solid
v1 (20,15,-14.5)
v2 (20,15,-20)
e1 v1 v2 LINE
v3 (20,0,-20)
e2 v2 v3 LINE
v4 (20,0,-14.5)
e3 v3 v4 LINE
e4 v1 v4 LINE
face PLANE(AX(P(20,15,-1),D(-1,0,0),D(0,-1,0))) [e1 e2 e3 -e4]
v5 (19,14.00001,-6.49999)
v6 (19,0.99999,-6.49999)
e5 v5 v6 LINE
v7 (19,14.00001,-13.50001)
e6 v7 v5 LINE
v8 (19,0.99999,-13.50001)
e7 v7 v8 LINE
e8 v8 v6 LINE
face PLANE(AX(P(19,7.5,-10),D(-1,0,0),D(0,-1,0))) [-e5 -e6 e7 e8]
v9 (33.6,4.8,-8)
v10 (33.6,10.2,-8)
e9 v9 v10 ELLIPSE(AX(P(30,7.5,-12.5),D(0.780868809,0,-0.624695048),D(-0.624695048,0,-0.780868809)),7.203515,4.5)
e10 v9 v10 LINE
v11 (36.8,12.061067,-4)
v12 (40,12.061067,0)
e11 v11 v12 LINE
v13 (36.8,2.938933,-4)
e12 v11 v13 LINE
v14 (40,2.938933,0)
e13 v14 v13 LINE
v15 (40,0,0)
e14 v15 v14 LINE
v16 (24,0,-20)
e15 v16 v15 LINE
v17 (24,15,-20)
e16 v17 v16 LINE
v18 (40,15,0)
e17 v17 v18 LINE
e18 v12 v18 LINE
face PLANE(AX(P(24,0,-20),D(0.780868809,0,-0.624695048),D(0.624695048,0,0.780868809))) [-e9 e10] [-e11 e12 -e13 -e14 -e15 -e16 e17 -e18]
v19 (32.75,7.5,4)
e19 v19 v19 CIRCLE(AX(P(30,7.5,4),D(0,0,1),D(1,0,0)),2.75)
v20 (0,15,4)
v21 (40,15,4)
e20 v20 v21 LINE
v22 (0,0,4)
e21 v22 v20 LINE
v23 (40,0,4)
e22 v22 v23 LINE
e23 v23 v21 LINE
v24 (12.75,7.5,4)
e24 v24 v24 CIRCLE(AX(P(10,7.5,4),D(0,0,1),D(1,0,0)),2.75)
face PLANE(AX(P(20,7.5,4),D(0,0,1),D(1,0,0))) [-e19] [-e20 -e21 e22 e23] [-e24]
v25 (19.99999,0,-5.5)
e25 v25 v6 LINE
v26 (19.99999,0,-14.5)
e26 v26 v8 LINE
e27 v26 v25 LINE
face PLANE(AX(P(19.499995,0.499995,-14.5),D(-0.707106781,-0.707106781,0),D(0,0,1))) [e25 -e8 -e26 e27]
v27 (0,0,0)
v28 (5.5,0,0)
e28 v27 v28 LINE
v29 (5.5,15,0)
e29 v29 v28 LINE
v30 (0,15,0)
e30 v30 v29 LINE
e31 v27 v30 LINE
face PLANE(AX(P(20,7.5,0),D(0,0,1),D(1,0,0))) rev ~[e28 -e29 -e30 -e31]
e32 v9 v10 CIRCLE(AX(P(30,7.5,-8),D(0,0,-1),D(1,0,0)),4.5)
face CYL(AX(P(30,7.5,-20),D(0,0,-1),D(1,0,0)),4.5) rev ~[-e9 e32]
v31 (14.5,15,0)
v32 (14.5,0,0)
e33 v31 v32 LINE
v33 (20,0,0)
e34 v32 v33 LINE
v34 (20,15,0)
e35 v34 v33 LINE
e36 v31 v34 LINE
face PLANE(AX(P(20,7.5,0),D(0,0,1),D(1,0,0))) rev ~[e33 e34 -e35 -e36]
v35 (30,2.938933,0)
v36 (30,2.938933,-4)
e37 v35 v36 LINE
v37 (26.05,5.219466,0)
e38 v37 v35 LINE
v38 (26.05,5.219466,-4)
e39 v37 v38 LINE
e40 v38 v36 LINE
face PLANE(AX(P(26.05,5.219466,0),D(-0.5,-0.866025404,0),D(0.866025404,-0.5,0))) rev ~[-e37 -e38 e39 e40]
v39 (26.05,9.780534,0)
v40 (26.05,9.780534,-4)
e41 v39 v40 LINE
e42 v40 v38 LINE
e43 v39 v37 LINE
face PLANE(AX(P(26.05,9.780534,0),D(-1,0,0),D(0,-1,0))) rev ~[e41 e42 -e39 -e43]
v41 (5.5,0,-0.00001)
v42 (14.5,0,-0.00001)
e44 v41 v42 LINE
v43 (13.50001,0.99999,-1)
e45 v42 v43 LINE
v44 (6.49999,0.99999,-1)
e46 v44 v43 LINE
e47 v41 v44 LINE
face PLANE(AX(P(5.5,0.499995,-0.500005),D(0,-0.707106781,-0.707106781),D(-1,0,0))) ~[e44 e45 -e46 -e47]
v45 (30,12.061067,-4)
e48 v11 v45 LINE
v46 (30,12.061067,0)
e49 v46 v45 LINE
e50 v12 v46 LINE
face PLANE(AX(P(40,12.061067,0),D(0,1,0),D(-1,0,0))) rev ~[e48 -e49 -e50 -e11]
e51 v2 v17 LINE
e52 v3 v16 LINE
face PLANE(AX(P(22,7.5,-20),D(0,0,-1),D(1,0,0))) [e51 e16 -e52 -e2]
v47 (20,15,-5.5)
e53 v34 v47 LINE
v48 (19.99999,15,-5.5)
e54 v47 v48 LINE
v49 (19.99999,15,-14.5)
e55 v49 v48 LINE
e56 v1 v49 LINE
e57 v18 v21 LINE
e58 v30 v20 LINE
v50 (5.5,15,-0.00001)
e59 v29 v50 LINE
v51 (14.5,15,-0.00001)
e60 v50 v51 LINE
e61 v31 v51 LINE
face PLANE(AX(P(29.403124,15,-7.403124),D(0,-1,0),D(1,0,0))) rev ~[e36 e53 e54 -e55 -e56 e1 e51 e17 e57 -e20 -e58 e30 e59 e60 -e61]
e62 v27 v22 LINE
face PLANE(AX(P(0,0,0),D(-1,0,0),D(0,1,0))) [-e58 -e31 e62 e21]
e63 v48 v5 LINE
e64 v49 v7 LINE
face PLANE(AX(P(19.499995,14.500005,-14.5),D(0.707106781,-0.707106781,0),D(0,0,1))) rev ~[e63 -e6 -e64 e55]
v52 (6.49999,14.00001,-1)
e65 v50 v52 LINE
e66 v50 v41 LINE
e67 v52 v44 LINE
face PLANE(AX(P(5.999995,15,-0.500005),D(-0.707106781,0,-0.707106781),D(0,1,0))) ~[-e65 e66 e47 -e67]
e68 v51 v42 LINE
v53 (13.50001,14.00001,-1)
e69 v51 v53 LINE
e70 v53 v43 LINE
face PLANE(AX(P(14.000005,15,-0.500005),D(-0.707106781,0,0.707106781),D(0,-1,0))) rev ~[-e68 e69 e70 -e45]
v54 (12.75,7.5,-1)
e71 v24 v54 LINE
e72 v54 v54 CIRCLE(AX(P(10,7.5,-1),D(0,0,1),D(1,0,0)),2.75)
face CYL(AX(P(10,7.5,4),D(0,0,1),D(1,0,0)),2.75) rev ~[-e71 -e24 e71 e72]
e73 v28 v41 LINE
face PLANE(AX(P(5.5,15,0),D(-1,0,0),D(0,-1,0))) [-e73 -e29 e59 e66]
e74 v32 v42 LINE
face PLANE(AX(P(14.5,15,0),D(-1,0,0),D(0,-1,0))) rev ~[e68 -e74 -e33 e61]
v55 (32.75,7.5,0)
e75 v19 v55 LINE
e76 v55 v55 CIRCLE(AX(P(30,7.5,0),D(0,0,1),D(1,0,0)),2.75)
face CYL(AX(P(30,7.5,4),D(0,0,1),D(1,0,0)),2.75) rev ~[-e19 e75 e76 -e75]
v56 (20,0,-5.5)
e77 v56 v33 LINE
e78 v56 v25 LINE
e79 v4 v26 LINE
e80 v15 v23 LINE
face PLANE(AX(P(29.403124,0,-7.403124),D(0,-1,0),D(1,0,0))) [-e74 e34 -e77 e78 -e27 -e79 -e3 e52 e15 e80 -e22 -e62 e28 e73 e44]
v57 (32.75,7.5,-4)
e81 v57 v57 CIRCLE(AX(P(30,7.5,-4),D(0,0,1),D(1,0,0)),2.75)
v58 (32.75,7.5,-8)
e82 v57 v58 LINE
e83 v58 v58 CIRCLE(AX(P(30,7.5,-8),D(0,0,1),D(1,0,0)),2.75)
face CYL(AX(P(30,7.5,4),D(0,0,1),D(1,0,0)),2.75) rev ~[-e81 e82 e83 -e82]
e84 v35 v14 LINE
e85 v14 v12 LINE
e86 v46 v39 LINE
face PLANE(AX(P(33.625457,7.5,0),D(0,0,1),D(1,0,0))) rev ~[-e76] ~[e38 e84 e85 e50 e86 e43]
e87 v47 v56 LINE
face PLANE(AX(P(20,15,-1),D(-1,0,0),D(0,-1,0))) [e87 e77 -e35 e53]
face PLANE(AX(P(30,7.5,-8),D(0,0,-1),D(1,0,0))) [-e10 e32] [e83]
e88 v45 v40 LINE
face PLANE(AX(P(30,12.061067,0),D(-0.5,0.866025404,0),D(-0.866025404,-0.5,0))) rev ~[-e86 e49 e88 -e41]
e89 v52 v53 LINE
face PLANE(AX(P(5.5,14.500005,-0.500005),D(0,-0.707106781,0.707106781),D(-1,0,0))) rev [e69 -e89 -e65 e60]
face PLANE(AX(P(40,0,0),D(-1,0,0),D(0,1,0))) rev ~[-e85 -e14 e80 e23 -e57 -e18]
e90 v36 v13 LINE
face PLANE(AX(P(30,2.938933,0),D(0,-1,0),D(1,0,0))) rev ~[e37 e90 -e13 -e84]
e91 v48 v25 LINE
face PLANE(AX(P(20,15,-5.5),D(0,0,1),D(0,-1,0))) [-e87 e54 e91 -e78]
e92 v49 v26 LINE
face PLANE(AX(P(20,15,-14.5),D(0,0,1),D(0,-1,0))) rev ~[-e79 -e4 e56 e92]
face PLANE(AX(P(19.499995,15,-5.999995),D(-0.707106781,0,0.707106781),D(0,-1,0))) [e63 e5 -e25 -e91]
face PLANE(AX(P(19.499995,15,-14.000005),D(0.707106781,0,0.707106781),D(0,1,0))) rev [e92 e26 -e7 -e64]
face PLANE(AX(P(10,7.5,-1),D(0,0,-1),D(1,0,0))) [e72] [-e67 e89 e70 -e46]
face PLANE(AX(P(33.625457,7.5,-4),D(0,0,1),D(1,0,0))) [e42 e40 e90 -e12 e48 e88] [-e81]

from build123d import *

# Parameters (mm, degrees)
F0_W      = 40
F0_H      = 15
F1_DEPTH  = 4
F2_W      = 9
F2_H      = 15
F2_W_2    = 4
F3_DEPTH  = 1
F4_DEPTH  = 19
F5_W      = 15
F5_H      = 9
F6_DEPTH  = 1
F7_SIZE   = 0.99999
F9_DEPTH  = 15
F12_DEPTH = 4
F13_R     = 2.75
F14_DEPTH = 24.001
F15_R     = 4.5
F16_DEPTH = 12


# Not quite as in the source:
# - a fillet or chamfer is up to 0.001 mm smaller than in the source, because OpenCascade refuses the exact size


with BuildPart() as f1:
    # F0 (on Top) → F1 (new body)
    with BuildSketch(Plane.XY):
        with Locations((20, 7.5)):
            Rectangle(F0_W, F0_H)
    extrude(amount=F1_DEPTH)

    # F2 (on face) → F3 (join)
    with BuildSketch(Plane(origin=(0, 0, 0), x_dir=(1, 0, 0), z_dir=(0, 0, -1))):
        with Locations((10, -7.5)):
            Rectangle(F2_W, F2_H)
        with Locations((22, -7.5)):
            Rectangle(F2_W_2, F2_H)
    extrude(amount=F3_DEPTH)

    # F4 (add): a face of the model
    f4_faces = [f1.faces().sort_by_distance(p)[0] for p in [
        (22, 7.5, -1),
    ]]
    extrude(f4_faces, amount=F4_DEPTH)

    # F5 (on face) → F6 (join)
    with BuildSketch(Plane(origin=(20, 0, 0), x_dir=(0, -1, 0), z_dir=(-1, 0, 0))):
        with Locations((-7.5, -10)):
            Rectangle(F5_W, F5_H)
    extrude(amount=F6_DEPTH)

    # F7 (size 1 in the source; OpenCascade refuses exactly that, so slightly less here)
    f7_edges = [f1.edges().sort_by_distance(p)[0] for p in [
        (19, 15, -10),
        (19, 7.5, -14.5),
        (19, 0, -10),
        (19, 7.5, -5.5),
        (10, 0, -1),
        (5.5, 7.5, -1),
        (10, 15, -1),
        (14.5, 7.5, -1),
    ]]
    chamfer(f7_edges, length=F7_SIZE)

    # F8 (on face) → F9 (join, through all)
    with BuildSketch(Plane.XZ):
        Polygon((40, 0), (24, 0), (24, -20), align=None)
    extrude(amount=-F9_DEPTH)

    # F11 (on offset) → F12 (cut)
    with BuildSketch(Plane.XY):
        Polygon((26.05, 5.2194664367), (30, 2.9389328734), (40, 2.9389328734), (40, 12.0610671266), (30, 12.0610671266), (26.05, 9.7805335633), align=None)
    extrude(amount=-F12_DEPTH, mode=Mode.SUBTRACT)

    # F13 (on face) → F14 (cut, through all)
    with BuildSketch(Plane.XY.offset(4)):
        with Locations((30, 7.5)):
            Circle(F13_R)
        with Locations((10, 7.5)):
            Circle(F13_R)
    extrude(amount=-F14_DEPTH, mode=Mode.SUBTRACT)

    # F15 (on face) → F16 (cut)
    with BuildSketch(Plane(origin=(0, 0, -20), x_dir=(1, 0, 0), z_dir=(0, 0, -1))):
        with Locations((30, -7.5)):
            Circle(F15_R)
    extrude(amount=-F16_DEPTH, mode=Mode.SUBTRACT)


solid = f1.part
